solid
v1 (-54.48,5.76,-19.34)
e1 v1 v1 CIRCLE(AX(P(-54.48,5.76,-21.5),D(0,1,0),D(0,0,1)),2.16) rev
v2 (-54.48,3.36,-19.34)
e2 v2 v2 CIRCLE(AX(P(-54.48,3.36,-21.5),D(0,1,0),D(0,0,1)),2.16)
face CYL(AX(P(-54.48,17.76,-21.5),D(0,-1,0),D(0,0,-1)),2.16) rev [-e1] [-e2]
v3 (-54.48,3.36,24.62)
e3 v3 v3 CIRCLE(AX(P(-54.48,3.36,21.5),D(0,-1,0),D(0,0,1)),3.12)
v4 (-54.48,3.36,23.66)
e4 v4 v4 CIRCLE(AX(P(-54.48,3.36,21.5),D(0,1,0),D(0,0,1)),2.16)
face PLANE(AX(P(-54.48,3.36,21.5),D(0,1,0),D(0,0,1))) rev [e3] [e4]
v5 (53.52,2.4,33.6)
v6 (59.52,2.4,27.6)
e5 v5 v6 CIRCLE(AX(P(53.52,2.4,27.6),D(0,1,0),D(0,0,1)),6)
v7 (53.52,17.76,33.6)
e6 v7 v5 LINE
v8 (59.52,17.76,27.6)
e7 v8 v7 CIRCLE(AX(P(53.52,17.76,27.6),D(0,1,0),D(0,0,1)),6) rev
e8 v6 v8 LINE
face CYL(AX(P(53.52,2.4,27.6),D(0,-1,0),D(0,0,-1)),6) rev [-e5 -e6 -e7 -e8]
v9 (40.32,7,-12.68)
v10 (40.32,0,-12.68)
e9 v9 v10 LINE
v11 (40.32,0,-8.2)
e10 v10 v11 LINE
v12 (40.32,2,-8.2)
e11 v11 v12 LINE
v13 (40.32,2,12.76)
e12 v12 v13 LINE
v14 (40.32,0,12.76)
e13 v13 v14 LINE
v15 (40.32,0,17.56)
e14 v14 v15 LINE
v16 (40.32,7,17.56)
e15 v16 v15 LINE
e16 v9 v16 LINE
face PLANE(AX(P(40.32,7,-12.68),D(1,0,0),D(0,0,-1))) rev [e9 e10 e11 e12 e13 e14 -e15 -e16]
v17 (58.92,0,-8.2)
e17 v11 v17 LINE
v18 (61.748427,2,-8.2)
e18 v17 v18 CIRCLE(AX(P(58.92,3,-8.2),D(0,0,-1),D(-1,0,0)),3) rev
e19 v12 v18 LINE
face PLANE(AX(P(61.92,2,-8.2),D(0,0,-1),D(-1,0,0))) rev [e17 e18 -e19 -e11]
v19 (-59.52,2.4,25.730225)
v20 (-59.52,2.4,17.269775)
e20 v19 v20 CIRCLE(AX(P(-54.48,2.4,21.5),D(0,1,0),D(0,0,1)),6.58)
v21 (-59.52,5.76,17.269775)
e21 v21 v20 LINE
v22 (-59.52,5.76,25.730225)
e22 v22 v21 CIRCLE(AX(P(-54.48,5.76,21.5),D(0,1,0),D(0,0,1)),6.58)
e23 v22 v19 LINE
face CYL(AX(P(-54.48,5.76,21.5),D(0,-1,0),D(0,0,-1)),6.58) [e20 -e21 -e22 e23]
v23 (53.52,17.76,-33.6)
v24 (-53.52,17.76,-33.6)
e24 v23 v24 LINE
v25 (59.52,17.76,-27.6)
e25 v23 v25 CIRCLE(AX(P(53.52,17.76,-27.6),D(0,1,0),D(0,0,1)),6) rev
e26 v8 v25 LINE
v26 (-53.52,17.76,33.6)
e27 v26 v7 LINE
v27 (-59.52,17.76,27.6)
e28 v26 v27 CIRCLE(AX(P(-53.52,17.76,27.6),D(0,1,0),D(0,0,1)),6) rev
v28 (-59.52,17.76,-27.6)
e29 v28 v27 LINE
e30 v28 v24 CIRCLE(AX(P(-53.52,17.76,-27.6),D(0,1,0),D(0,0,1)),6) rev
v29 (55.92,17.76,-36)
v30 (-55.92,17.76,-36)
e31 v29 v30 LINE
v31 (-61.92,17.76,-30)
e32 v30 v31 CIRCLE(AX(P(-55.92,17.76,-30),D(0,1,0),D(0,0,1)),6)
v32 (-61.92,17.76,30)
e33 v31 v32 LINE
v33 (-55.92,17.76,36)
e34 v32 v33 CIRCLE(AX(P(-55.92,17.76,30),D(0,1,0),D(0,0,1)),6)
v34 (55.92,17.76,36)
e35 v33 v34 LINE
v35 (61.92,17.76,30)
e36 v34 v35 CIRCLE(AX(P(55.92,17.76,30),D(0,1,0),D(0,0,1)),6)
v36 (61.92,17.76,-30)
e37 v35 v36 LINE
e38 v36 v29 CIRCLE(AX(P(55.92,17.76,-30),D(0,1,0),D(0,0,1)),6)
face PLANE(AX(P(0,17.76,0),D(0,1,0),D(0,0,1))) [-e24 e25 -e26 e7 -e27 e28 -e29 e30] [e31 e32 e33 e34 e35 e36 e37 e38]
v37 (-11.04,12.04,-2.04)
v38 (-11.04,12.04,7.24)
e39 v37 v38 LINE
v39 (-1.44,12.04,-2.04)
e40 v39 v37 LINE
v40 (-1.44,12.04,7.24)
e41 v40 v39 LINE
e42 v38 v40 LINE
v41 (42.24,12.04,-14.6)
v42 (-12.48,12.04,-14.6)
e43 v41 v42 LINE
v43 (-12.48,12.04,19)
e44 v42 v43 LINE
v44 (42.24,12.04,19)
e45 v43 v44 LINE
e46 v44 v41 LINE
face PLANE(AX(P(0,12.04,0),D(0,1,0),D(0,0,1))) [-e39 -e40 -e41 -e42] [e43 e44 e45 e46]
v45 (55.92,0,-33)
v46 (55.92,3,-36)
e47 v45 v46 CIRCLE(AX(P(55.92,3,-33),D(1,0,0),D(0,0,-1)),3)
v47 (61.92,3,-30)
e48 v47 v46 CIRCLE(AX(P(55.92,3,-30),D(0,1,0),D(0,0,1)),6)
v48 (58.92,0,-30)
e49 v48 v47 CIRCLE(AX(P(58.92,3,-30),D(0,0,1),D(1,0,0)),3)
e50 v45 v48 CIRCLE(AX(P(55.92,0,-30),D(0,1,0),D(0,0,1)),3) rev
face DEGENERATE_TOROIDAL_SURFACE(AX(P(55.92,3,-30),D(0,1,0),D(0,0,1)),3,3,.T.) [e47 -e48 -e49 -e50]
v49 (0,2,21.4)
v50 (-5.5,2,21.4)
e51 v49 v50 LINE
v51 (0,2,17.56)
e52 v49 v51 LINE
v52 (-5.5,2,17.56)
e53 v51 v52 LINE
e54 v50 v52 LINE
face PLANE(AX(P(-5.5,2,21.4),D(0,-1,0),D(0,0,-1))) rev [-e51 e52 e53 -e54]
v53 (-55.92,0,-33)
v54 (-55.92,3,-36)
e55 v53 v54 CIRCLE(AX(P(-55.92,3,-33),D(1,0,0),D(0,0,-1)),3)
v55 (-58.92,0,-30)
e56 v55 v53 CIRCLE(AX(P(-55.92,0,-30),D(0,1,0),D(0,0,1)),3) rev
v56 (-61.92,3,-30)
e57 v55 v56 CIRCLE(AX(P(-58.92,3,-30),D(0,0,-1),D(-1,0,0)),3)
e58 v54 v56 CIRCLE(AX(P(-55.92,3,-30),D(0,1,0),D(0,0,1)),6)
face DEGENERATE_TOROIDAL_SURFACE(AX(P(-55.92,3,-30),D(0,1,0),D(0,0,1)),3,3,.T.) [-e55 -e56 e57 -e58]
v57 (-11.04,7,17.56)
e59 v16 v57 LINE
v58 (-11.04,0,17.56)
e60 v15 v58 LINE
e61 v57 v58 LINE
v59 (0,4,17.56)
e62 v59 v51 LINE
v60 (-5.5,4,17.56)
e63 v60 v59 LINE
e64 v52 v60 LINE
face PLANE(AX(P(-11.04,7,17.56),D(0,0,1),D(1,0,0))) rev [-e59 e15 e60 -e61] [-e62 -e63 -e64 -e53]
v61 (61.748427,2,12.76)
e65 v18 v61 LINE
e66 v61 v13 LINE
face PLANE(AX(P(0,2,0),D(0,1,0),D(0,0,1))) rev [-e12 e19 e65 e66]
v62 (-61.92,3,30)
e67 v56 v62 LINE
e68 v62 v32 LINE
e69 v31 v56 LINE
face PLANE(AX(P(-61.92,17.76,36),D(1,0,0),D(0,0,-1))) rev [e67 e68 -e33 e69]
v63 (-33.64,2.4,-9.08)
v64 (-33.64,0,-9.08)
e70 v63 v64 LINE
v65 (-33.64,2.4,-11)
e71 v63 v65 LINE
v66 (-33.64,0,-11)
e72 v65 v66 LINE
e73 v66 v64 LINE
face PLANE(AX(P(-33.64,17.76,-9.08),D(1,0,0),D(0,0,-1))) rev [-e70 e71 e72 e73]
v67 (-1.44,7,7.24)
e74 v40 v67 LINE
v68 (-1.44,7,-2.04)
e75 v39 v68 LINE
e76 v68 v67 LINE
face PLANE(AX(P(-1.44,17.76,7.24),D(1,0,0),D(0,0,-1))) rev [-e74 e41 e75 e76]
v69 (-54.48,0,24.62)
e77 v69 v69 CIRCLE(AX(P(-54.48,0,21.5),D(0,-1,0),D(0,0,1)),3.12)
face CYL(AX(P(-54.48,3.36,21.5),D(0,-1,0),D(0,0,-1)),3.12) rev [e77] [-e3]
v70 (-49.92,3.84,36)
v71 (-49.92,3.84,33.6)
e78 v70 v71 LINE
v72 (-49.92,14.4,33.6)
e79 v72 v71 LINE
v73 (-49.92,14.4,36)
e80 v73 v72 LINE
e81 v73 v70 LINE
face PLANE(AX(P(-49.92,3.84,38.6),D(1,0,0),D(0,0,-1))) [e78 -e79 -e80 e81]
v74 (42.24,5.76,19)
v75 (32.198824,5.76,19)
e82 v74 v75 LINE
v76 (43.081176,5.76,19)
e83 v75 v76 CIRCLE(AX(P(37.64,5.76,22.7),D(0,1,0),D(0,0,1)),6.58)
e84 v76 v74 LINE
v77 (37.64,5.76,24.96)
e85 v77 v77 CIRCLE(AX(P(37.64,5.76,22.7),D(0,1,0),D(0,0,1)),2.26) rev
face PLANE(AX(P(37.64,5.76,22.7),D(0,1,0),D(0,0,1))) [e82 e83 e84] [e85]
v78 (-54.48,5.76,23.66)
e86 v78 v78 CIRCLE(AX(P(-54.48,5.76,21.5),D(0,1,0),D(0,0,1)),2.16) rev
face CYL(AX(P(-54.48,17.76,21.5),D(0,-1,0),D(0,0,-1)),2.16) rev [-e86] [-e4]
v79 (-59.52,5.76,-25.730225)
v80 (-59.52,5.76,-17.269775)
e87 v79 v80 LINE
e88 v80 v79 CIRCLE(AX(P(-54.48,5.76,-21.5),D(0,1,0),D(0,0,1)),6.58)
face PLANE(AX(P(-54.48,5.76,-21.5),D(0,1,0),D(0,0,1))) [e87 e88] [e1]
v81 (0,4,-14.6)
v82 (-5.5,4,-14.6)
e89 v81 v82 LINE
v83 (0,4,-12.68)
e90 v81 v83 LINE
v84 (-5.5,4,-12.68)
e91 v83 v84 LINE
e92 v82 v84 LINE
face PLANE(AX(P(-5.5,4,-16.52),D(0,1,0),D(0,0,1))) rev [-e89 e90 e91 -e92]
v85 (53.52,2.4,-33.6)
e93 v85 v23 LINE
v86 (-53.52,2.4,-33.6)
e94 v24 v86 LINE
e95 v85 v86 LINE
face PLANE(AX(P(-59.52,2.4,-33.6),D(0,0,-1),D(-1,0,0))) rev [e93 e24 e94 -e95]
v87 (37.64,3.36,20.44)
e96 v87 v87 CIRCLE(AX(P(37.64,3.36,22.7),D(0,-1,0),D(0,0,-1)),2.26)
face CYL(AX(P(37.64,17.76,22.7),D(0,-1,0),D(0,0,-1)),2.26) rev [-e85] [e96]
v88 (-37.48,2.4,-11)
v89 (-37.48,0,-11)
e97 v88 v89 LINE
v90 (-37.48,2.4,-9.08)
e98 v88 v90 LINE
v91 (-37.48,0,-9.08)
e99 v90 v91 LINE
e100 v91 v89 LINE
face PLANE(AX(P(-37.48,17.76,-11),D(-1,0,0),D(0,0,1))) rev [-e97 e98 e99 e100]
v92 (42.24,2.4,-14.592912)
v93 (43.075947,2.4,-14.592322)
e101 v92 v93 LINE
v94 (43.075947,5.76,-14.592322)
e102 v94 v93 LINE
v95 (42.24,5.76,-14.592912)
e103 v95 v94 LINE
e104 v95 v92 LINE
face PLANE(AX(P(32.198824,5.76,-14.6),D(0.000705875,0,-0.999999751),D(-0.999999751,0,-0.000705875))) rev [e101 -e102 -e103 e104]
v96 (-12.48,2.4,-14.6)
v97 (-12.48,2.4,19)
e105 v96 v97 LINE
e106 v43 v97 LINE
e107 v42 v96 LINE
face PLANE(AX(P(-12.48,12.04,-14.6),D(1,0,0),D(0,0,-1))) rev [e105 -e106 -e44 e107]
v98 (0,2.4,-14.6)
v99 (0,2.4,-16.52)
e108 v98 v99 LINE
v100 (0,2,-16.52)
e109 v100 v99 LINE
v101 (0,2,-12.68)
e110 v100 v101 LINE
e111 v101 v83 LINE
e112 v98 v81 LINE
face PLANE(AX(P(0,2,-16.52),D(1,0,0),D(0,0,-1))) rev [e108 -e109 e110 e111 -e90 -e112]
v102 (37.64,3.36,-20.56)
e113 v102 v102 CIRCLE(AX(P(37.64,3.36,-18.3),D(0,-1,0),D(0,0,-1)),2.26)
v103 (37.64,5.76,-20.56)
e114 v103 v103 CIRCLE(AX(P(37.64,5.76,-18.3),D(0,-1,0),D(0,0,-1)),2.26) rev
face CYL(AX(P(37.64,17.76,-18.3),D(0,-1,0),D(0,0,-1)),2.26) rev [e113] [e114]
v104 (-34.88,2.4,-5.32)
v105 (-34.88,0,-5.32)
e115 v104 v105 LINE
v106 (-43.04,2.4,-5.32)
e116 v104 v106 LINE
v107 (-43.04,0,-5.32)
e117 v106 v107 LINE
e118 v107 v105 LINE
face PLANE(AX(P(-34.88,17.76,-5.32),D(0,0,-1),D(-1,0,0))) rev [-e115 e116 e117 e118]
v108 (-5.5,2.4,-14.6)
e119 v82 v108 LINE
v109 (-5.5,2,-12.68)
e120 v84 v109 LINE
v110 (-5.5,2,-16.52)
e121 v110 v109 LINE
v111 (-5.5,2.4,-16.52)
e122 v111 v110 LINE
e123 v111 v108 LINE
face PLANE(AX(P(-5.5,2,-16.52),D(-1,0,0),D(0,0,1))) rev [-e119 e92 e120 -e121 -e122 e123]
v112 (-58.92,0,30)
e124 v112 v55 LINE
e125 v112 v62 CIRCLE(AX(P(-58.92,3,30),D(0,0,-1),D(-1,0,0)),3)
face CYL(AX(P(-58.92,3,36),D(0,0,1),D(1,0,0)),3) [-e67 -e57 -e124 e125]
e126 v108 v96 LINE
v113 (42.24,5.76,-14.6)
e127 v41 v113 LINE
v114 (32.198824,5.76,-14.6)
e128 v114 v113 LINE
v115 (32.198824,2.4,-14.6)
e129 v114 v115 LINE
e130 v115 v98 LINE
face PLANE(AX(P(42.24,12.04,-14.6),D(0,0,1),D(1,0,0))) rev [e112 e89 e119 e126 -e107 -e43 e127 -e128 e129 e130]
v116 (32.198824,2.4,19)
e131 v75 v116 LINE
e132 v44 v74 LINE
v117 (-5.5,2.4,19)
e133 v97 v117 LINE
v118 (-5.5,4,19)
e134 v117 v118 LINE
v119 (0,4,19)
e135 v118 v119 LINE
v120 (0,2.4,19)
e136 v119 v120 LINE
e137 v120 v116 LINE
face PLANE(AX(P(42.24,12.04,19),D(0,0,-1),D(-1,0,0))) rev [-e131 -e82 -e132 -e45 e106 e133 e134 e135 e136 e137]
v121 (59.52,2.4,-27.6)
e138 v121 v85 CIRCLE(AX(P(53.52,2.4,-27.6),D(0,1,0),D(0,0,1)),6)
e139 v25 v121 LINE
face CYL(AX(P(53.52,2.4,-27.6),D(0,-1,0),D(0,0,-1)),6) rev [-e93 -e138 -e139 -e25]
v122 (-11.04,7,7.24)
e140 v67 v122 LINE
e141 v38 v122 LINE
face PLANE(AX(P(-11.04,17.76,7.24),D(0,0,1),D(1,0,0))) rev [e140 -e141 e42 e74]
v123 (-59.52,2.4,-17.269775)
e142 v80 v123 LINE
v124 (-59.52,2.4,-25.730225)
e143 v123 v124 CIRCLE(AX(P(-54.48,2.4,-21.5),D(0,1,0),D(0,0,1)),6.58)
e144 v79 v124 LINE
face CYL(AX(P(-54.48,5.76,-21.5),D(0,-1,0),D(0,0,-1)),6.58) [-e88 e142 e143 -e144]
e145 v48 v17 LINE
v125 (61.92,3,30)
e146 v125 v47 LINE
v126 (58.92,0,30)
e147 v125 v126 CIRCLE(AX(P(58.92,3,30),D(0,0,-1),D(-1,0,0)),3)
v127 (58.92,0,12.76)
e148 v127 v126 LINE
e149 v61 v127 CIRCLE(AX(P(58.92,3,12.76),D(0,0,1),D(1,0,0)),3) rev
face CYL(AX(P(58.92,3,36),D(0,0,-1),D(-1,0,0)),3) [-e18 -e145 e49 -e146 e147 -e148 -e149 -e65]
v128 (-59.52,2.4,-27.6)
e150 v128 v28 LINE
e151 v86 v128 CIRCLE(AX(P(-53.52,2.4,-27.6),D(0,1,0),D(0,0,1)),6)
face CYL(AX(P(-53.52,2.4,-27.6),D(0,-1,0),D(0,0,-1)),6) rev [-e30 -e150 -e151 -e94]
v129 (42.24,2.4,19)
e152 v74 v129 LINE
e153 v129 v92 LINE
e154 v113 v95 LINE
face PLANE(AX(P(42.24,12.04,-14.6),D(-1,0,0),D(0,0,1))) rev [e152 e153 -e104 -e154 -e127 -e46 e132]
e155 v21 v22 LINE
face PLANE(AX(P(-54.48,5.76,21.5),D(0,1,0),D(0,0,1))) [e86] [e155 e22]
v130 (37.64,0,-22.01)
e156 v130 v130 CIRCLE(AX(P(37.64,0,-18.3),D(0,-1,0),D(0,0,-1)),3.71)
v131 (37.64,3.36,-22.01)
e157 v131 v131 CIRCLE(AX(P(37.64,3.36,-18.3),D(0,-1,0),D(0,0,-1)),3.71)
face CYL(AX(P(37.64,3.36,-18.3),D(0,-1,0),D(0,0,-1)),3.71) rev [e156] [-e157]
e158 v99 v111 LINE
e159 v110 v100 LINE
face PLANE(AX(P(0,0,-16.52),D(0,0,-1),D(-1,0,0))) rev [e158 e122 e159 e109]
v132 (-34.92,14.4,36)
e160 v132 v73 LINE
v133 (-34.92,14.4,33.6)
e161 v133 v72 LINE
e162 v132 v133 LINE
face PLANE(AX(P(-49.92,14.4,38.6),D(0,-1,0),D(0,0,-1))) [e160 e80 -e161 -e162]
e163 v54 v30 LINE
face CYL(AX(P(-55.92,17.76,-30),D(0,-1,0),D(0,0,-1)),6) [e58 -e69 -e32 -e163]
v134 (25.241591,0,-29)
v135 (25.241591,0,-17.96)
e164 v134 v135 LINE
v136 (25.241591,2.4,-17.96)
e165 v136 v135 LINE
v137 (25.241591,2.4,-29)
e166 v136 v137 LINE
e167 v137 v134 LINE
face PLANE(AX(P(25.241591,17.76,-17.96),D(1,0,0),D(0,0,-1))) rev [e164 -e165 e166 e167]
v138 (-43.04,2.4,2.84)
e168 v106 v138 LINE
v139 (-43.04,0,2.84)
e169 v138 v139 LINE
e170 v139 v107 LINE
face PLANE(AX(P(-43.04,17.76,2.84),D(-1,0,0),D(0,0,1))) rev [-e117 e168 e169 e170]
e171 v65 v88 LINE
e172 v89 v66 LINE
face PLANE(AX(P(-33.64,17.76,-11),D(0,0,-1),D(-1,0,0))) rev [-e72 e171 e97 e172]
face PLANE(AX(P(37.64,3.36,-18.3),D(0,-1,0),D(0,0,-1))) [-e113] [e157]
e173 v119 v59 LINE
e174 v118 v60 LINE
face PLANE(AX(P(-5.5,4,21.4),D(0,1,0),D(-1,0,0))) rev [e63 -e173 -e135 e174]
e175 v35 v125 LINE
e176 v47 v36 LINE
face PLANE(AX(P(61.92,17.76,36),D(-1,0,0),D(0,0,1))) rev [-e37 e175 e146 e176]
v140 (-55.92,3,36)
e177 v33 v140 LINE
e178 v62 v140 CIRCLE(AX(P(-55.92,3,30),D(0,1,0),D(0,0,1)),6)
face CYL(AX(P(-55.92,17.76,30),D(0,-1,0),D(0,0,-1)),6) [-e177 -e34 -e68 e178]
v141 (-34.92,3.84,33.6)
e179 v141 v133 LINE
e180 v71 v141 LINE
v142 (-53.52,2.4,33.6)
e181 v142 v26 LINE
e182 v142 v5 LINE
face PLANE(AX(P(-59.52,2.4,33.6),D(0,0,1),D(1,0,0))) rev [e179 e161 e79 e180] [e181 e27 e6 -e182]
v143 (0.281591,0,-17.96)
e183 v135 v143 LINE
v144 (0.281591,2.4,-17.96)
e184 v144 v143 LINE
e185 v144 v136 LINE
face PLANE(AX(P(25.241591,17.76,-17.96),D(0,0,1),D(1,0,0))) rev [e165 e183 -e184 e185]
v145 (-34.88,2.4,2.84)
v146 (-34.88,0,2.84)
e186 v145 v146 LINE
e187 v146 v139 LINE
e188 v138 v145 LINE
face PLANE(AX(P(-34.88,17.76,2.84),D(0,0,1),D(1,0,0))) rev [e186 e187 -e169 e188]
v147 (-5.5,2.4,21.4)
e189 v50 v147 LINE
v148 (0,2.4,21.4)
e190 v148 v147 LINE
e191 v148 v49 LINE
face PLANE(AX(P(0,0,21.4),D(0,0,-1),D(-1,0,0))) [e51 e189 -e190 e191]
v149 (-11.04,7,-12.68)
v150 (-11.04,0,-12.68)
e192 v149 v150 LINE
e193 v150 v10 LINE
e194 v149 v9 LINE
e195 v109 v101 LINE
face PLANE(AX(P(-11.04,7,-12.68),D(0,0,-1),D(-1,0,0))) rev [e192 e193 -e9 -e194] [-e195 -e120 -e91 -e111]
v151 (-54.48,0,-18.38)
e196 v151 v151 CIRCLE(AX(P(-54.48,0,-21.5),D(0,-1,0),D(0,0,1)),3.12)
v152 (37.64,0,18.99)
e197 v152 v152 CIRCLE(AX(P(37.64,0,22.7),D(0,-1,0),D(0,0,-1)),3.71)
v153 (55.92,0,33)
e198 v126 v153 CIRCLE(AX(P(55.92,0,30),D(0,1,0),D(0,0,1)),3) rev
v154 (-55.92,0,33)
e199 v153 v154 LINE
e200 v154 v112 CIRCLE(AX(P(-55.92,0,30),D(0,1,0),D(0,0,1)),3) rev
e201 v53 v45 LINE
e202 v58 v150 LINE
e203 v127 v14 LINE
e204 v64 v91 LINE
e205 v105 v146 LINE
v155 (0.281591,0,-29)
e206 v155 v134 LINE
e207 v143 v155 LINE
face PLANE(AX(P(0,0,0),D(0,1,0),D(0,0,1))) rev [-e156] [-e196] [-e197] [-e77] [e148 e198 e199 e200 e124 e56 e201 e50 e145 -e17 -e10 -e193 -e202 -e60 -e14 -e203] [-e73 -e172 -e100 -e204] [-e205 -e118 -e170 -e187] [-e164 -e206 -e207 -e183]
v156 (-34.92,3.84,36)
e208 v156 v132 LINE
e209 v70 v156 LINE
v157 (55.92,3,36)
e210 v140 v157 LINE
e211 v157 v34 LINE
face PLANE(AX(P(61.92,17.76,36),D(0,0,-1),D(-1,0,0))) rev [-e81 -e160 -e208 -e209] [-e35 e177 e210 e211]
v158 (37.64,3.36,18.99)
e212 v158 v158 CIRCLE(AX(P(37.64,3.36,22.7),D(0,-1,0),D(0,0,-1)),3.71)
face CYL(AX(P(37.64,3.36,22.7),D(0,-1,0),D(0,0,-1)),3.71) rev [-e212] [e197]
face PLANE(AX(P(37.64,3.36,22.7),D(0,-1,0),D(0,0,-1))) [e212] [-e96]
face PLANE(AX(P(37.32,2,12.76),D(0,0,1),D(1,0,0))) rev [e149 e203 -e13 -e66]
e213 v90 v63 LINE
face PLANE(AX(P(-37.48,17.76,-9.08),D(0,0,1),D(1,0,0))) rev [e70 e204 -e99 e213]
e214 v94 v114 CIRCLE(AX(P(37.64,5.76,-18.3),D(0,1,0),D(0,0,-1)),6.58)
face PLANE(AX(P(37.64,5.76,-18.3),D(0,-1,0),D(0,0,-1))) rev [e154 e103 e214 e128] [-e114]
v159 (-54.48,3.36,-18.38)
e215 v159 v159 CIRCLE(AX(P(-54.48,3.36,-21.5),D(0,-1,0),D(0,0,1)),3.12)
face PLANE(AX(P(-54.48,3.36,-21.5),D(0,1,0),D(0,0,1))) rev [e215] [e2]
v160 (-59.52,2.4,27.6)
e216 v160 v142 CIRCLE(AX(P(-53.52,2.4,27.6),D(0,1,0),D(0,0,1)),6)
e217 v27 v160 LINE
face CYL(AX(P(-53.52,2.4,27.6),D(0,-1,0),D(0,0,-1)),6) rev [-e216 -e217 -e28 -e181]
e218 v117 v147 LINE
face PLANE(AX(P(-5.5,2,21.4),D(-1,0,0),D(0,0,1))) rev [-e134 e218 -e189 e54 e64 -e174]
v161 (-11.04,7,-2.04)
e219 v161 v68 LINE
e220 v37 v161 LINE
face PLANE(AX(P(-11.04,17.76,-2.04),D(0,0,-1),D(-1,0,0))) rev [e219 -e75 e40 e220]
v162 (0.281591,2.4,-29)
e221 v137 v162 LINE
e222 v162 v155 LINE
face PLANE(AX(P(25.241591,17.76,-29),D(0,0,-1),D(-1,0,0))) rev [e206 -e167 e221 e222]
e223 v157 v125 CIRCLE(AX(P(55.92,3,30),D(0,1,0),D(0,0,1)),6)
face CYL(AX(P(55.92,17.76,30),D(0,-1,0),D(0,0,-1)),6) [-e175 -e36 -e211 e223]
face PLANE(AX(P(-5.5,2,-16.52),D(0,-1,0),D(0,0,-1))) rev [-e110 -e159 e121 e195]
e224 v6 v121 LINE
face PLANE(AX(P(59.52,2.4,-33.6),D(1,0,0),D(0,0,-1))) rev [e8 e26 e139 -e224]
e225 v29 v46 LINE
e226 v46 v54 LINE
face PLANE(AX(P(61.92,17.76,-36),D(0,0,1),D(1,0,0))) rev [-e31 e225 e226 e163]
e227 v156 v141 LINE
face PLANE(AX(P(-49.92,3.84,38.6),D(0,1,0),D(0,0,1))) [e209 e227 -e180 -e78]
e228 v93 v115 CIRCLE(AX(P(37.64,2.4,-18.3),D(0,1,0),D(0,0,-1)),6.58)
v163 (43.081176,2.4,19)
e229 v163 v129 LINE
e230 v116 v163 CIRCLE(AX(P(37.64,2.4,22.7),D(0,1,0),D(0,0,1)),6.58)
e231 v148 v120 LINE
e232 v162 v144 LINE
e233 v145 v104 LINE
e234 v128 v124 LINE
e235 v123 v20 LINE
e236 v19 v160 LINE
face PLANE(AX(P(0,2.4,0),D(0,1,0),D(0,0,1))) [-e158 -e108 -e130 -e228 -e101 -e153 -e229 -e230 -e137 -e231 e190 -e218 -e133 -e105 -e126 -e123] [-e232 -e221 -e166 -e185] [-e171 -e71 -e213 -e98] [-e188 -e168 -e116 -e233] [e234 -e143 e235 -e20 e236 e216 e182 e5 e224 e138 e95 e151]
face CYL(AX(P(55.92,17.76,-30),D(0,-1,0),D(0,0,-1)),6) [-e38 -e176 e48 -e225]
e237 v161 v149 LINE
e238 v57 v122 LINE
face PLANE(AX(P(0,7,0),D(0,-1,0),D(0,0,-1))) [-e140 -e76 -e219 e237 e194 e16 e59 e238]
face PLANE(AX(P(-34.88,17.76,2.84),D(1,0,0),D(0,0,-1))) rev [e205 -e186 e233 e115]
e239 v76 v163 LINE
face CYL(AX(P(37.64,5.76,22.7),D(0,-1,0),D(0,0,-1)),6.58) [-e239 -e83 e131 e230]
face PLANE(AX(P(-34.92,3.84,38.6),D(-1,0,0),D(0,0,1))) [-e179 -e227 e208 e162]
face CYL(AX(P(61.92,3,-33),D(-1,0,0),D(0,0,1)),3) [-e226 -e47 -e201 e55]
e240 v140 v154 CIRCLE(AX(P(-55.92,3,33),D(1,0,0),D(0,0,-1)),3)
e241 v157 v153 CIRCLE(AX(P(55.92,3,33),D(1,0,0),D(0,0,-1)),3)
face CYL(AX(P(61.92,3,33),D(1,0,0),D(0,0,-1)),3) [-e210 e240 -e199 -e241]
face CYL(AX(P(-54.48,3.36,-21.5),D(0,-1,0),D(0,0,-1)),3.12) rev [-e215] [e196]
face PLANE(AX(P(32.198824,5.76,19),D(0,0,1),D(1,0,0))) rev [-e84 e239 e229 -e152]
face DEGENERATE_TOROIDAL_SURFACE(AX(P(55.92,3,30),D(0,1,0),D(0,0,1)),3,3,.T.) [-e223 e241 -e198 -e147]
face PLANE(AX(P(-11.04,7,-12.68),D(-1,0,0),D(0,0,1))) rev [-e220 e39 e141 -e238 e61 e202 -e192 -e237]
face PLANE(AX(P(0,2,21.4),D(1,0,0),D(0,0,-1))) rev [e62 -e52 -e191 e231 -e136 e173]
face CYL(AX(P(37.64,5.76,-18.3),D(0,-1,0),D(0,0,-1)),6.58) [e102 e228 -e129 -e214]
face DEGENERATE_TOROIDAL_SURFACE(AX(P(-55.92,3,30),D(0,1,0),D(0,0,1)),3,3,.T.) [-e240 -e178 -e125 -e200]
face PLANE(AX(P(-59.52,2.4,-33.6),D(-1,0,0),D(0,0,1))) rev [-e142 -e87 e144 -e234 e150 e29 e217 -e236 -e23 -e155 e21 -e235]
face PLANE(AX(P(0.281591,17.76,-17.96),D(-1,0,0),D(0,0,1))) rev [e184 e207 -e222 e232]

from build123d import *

# Parameters (mm, degrees)
SKETCH_1_W           = 123.84
SKETCH_1_H           = 72
EXTRUDE_1_DEPTH      = 17.76
SKETCH_8_W           = 119.04
SKETCH_8_H           = 67.2
CUT_EXTRUDE_5_DEPTH  = 15.36
SKETCH_10_W          = 54.72
SKETCH_10_H          = 33.6
EXTRUDE_2_DEPTH      = 9.64
SKETCH_11_W          = 15
SKETCH_11_H          = 10.56
CUT_EXTRUDE_7_DEPTH  = 5
SKETCH_12_W          = 51.36
SKETCH_12_H          = 30.24
CUT_EXTRUDE_8_DEPTH  = 7
SKETCH_13_W          = 24.6
SKETCH_13_H          = 20.96
CUT_EXTRUDE_9_DEPTH  = 2
CUT_EXTRUDE_16_DEPTH = 73.428336996
FILLET_1_R           = 6
FILLET_3_R           = 3
FILLET_5_R           = 6
SKETCH_19_W          = 5.5
SKETCH_19_H          = 2
CUT_EXTRUDE_14_DEPTH = 3.84
SKETCH_20_W          = 5.5
SKETCH_20_H          = 2
CUT_EXTRUDE_15_DEPTH = 3.84
EXTRUDE_3_DEPTH      = 3.36
EXTRUDE_4_DEPTH      = 3.36
SKETCH_25_R          = 2.16
SKETCH_25_R_2        = 2.26
CUT_EXTRUDE_17_DEPTH = 74.793658264
SKETCH_22_R          = 3.71
SKETCH_22_R_2        = 3.12
CUT_EXTRUDE_18_DEPTH = 3.36
SKETCH_26_W          = 24.96
SKETCH_26_H          = 11.04
SKETCH_26_W_2        = 3.84
SKETCH_26_H_2        = 1.92
SKETCH_26_W_3        = 8.16
SKETCH_26_H_3        = 8.16
CUT_EXTRUDE_19_DEPTH = 74.793658264


with BuildPart() as part:
    # Эскиз1 → Бобышка-Вытянуть1 (new body)
    with BuildSketch(Plane(origin=(0, 0, 0), x_dir=(1, 0, 0), z_dir=(0, 1, 0))):
        Rectangle(SKETCH_1_W, SKETCH_1_H)
    extrude(amount=EXTRUDE_1_DEPTH)

    # Эскиз8 → Вырез-Вытянуть5 (cut)
    with BuildSketch(Plane(origin=(0, 17.76, 0), x_dir=(1, 0, 0), z_dir=(0, 1, 0))):
        Rectangle(SKETCH_8_W, SKETCH_8_H)
    extrude(amount=-CUT_EXTRUDE_5_DEPTH, mode=Mode.SUBTRACT)

    # Эскиз10 → Бобышка-Вытянуть2 (add)
    with BuildSketch(Plane(origin=(0, 2.4, 0), x_dir=(1, 0, 0), z_dir=(0, 1, 0))):
        with Locations((14.88, -2.2)):
            Rectangle(SKETCH_10_W, SKETCH_10_H)
    extrude(amount=EXTRUDE_2_DEPTH)

    # Эскиз11 → Вырез-Вытянуть7 (cut)
    with BuildSketch(Plane.XY.offset(33.6)):
        with Locations((-42.42, 9.12)):
            Rectangle(SKETCH_11_W, SKETCH_11_H)
    extrude(amount=CUT_EXTRUDE_7_DEPTH, mode=Mode.SUBTRACT)

    # Эскиз12 → Вырез-Вытянуть8 (cut)
    with BuildSketch(Plane.XZ):
        with Locations((14.64, 2.44)):
            Rectangle(SKETCH_12_W, SKETCH_12_H)
    extrude(amount=-CUT_EXTRUDE_8_DEPTH, mode=Mode.SUBTRACT)

    # Эскиз13 → Вырез-Вытянуть9 (cut)
    with BuildSketch(Plane.XZ):
        with Locations((49.62, 2.28)):
            Rectangle(SKETCH_13_W, SKETCH_13_H)
    extrude(amount=-CUT_EXTRUDE_9_DEPTH, mode=Mode.SUBTRACT)

    # Эскиз21 → Вырез-Вытянуть16 (cut, through all)
    with BuildSketch(Plane.XZ.offset(-7)):
        Polygon((-1.44, 7.24), (-1.44, -2.04), (-11.04, -2.04), (-11.04, 2.44), (-11.04, 7.24), align=None)
    extrude(amount=-CUT_EXTRUDE_16_DEPTH, mode=Mode.SUBTRACT)

    # Скругление1
    fillet_1_edges = [part.edges().sort_by_distance(p)[0] for p in [
        (-61.92, 8.88, -36),
        (61.92, 8.88, -36),
        (61.92, 8.88, 36),
        (-61.92, 8.88, 36),
    ]]
    fillet(fillet_1_edges, radius=FILLET_1_R)

    # Скругление3
    # the kernel refuses this fillet: 3 mm, written as the material it takes off along each edge
    with BuildSketch(Plane(origin=(55.92, 0, -30), x_dir=(1, 0, 0), z_dir=(0, 0, 1))) as fillet_3_piece_1:
        with BuildLine():
            CenterArc((6 - FILLET_3_R, FILLET_3_R), FILLET_3_R, 270, 90)
            Line((6, FILLET_3_R), (6 + FILLET_3_R * 0.02, FILLET_3_R))
            Line((6 + FILLET_3_R * 0.02, FILLET_3_R), (6 + FILLET_3_R * 0.02, -FILLET_3_R * 0.02))
            Line((6 + FILLET_3_R * 0.02, -FILLET_3_R * 0.02), (6 - FILLET_3_R, -FILLET_3_R * 0.02))
            Line((6 - FILLET_3_R, -FILLET_3_R * 0.02), (6 - FILLET_3_R, 0))
        make_face()
    revolve(axis=Axis((55.92, 0, -30), (0, 1, 0)), revolution_arc=90, mode=Mode.SUBTRACT)
    with BuildSketch(Plane(origin=(-55.92, 0, -36), x_dir=(0, 0, 1), z_dir=(1, 0, 0))) as fillet_3_piece_2:
        with BuildLine():
            CenterArc((FILLET_3_R, -FILLET_3_R), FILLET_3_R, 90, 90)
            Line((0, -FILLET_3_R), (-FILLET_3_R * 0.02, -FILLET_3_R))
            Line((-FILLET_3_R * 0.02, -FILLET_3_R), (-FILLET_3_R * 0.02, FILLET_3_R * 0.02))
            Line((-FILLET_3_R * 0.02, FILLET_3_R * 0.02), (FILLET_3_R, FILLET_3_R * 0.02))
            Line((FILLET_3_R, FILLET_3_R * 0.02), (FILLET_3_R, 0))
        make_face()
    extrude(amount=111.84, mode=Mode.SUBTRACT)
    with BuildSketch(Plane(origin=(-55.92, 0, -30), x_dir=(-1, 0, 0), z_dir=(0, 0, 1))) as fillet_3_piece_3:
        with BuildLine():
            CenterArc((6 - FILLET_3_R, -FILLET_3_R), FILLET_3_R, 0, 90)
            Line((6, -FILLET_3_R), (6 + FILLET_3_R * 0.02, -FILLET_3_R))
            Line((6 + FILLET_3_R * 0.02, -FILLET_3_R), (6 + FILLET_3_R * 0.02, FILLET_3_R * 0.02))
            Line((6 + FILLET_3_R * 0.02, FILLET_3_R * 0.02), (6 - FILLET_3_R, FILLET_3_R * 0.02))
            Line((6 - FILLET_3_R, FILLET_3_R * 0.02), (6 - FILLET_3_R, 0))
        make_face()
    revolve(axis=Axis((-55.92, 0, -30), (0, -1, 0)), revolution_arc=90, mode=Mode.SUBTRACT)
    with BuildSketch(Plane(origin=(-61.92, 0, 30), x_dir=(1, 0, 0), z_dir=(0, 0, -1))) as fillet_3_piece_4:
        with BuildLine():
            CenterArc((FILLET_3_R, -FILLET_3_R), FILLET_3_R, 90, 90)
            Line((0, -FILLET_3_R), (-FILLET_3_R * 0.02, -FILLET_3_R))
            Line((-FILLET_3_R * 0.02, -FILLET_3_R), (-FILLET_3_R * 0.02, FILLET_3_R * 0.02))
            Line((-FILLET_3_R * 0.02, FILLET_3_R * 0.02), (FILLET_3_R, FILLET_3_R * 0.02))
            Line((FILLET_3_R, FILLET_3_R * 0.02), (FILLET_3_R, 0))
        make_face()
    extrude(amount=60, mode=Mode.SUBTRACT)
    with BuildSketch(Plane(origin=(-55.92, 0, 30), x_dir=(0, 0, 1), z_dir=(1, 0, 0))) as fillet_3_piece_5:
        with BuildLine():
            CenterArc((6 - FILLET_3_R, -FILLET_3_R), FILLET_3_R, 0, 90)
            Line((6, -FILLET_3_R), (6 + FILLET_3_R * 0.02, -FILLET_3_R))
            Line((6 + FILLET_3_R * 0.02, -FILLET_3_R), (6 + FILLET_3_R * 0.02, FILLET_3_R * 0.02))
            Line((6 + FILLET_3_R * 0.02, FILLET_3_R * 0.02), (6 - FILLET_3_R, FILLET_3_R * 0.02))
            Line((6 - FILLET_3_R, FILLET_3_R * 0.02), (6 - FILLET_3_R, 0))
        make_face()
    revolve(axis=Axis((-55.92, 0, 30), (0, -1, 0)), revolution_arc=90, mode=Mode.SUBTRACT)
    with BuildSketch(Plane(origin=(61.92, 0, -5.24), x_dir=(-1, 0, 0), z_dir=(0, 0, 1))) as fillet_3_piece_6:
        with BuildLine():
            CenterArc((FILLET_3_R, -FILLET_3_R), FILLET_3_R, 90, 90)
            Line((0, -FILLET_3_R), (-FILLET_3_R * 0.02, -FILLET_3_R))
            Line((-FILLET_3_R * 0.02, -FILLET_3_R), (-FILLET_3_R * 0.02, FILLET_3_R * 0.02))
            Line((-FILLET_3_R * 0.02, FILLET_3_R * 0.02), (FILLET_3_R, FILLET_3_R * 0.02))
            Line((FILLET_3_R, FILLET_3_R * 0.02), (FILLET_3_R, 0))
        make_face()
    extrude(amount=35.24, mode=Mode.SUBTRACT)
    with BuildSketch(Plane(origin=(55.92, 0, 30), x_dir=(0, 0, 1), z_dir=(-1, 0, 0))) as fillet_3_piece_7:
        with BuildLine():
            CenterArc((6 - FILLET_3_R, FILLET_3_R), FILLET_3_R, 270, 90)
            Line((6, FILLET_3_R), (6 + FILLET_3_R * 0.02, FILLET_3_R))
            Line((6 + FILLET_3_R * 0.02, FILLET_3_R), (6 + FILLET_3_R * 0.02, -FILLET_3_R * 0.02))
            Line((6 + FILLET_3_R * 0.02, -FILLET_3_R * 0.02), (6 - FILLET_3_R, -FILLET_3_R * 0.02))
            Line((6 - FILLET_3_R, -FILLET_3_R * 0.02), (6 - FILLET_3_R, 0))
        make_face()
    revolve(axis=Axis((55.92, 0, 30), (0, 1, 0)), revolution_arc=90, mode=Mode.SUBTRACT)
    with BuildSketch(Plane(origin=(55.92, 0, 36), x_dir=(0, 1, 0), z_dir=(-1, 0, 0))) as fillet_3_piece_8:
        with BuildLine():
            CenterArc((FILLET_3_R, FILLET_3_R), FILLET_3_R, 180, 90)
            Line((0, FILLET_3_R), (-FILLET_3_R * 0.02, FILLET_3_R))
            Line((-FILLET_3_R * 0.02, FILLET_3_R), (-FILLET_3_R * 0.02, -FILLET_3_R * 0.02))
            Line((-FILLET_3_R * 0.02, -FILLET_3_R * 0.02), (FILLET_3_R, -FILLET_3_R * 0.02))
            Line((FILLET_3_R, -FILLET_3_R * 0.02), (FILLET_3_R, 0))
        make_face()
    extrude(amount=111.84, mode=Mode.SUBTRACT)
    with BuildSketch(Plane(origin=(61.92, 0, -30), x_dir=(-1, 0, 0), z_dir=(0, 0, 1))) as fillet_3_piece_9:
        with BuildLine():
            CenterArc((FILLET_3_R, -FILLET_3_R), FILLET_3_R, 90, 90)
            Line((0, -FILLET_3_R), (-FILLET_3_R * 0.02, -FILLET_3_R))
            Line((-FILLET_3_R * 0.02, -FILLET_3_R), (-FILLET_3_R * 0.02, FILLET_3_R * 0.02))
            Line((-FILLET_3_R * 0.02, FILLET_3_R * 0.02), (FILLET_3_R, FILLET_3_R * 0.02))
            Line((FILLET_3_R, FILLET_3_R * 0.02), (FILLET_3_R, 0))
        make_face()
    extrude(amount=39.8, mode=Mode.SUBTRACT)

    # Скругление5
    fillet_5_edges = [part.edges().sort_by_distance(p)[0] for p in [
        (-59.52, 10.08, 33.6),
        (-59.52, 10.08, -33.6),
        (59.52, 10.08, -33.6),
        (59.52, 10.08, 33.6),
    ]]
    fillet(fillet_5_edges, radius=FILLET_5_R)

    # Эскиз19 → Вырез-Вытянуть14 (cut)
    with BuildSketch(Plane(origin=(0, 0, 17.56), x_dir=(-1, 0, 0), z_dir=(0, 0, -1))):
        with Locations((2.75, 3)):
            Rectangle(SKETCH_19_W, SKETCH_19_H)
    extrude(amount=-CUT_EXTRUDE_14_DEPTH, mode=Mode.SUBTRACT)

    # Эскиз20 → Вырез-Вытянуть15 (cut)
    with BuildSketch(Plane.XY.offset(-12.68)):
        with Locations((-2.75, 3)):
            Rectangle(SKETCH_20_W, SKETCH_20_H)
    extrude(amount=-CUT_EXTRUDE_15_DEPTH, mode=Mode.SUBTRACT)

    # Эскиз24 → Бобышка-Вытянуть3 (add)
    with BuildSketch(Plane(origin=(0, 2.4, 0), x_dir=(1, 0, 0), z_dir=(0, 1, 0))):
        with BuildLine():
            Line((32.198823657, -19), (43.081176343, -19))
            ThreePointArc((43.081176343, -19), (37.64, -29.28), (32.198823657, -19))
        make_face()
        with BuildLine():
            Line((32.198823657, 14.6), (43.075947447, 14.592322107))
            ThreePointArc((43.075947447, 14.592322107), (37.644644658, 24.879998361), (32.198823657, 14.6))
        make_face()
    extrude(amount=EXTRUDE_3_DEPTH)

    # Эскиз23 → Бобышка-Вытянуть4 (add)
    with BuildSketch(Plane(origin=(0, 2.4, 0), x_dir=(1, 0, 0), z_dir=(0, 1, 0))):
        with BuildLine():
            Line((-59.52, 25.73022458), (-59.52, 17.26977542))
            ThreePointArc((-59.52, 17.26977542), (-47.9, 21.5), (-59.52, 25.73022458))
        make_face()
        with BuildLine():
            Line((-59.52, -25.73022458), (-59.52, -17.26977542))
            ThreePointArc((-59.52, -17.26977542), (-47.9, -21.5), (-59.52, -25.73022458))
        make_face()
    extrude(amount=EXTRUDE_4_DEPTH)

    # Эскиз25 → Вырез-Вытянуть17 (cut, through all)
    with BuildSketch(Plane(origin=(0, 0, 0), x_dir=(1, 0, 0), z_dir=(0, 1, 0))):
        with Locations(Location((-54.48, -21.5, 0), (0, 0, 270))):
            Circle(SKETCH_25_R)
        with Locations(Location((-54.48, 21.5, 0), (0, 0, 270))):
            Circle(SKETCH_25_R)
        with Locations(Location((37.64, 18.3, 0), (0, 0, 90))):
            Circle(SKETCH_25_R_2)
        with Locations(Location((37.64, -22.7, 0), (0, 0, 90))):
            Circle(SKETCH_25_R_2)
    extrude(amount=CUT_EXTRUDE_17_DEPTH, mode=Mode.SUBTRACT)

    # Эскиз22 → Вырез-Вытянуть18 (cut)
    with BuildSketch(Plane.XZ):
        with Locations(Location((37.64, -18.3, 0), (0, 0, 270))):
            Circle(SKETCH_22_R)
        with Locations(Location((37.64, 22.7, 0), (0, 0, 270))):
            Circle(SKETCH_22_R)
        with Locations(Location((-54.48, 21.5, 0), (0, 0, 90))):
            Circle(SKETCH_22_R_2)
        with Locations(Location((-54.48, -21.5, 0), (0, 0, 90))):
            Circle(SKETCH_22_R_2)
    extrude(amount=-CUT_EXTRUDE_18_DEPTH, mode=Mode.SUBTRACT)

    # Эскиз26 → Вырез-Вытянуть19 (cut, through all)
    with BuildSketch(Plane.XZ):
        with Locations((12.761591223, -23.48)):
            Rectangle(SKETCH_26_W, SKETCH_26_H)
        with Locations((-35.56, -10.04)):
            Rectangle(SKETCH_26_W_2, SKETCH_26_H_2)
        with Locations((-38.96, -1.24)):
            Rectangle(SKETCH_26_W_3, SKETCH_26_H_3)
    extrude(amount=-CUT_EXTRUDE_19_DEPTH, mode=Mode.SUBTRACT)


solid = part.part
